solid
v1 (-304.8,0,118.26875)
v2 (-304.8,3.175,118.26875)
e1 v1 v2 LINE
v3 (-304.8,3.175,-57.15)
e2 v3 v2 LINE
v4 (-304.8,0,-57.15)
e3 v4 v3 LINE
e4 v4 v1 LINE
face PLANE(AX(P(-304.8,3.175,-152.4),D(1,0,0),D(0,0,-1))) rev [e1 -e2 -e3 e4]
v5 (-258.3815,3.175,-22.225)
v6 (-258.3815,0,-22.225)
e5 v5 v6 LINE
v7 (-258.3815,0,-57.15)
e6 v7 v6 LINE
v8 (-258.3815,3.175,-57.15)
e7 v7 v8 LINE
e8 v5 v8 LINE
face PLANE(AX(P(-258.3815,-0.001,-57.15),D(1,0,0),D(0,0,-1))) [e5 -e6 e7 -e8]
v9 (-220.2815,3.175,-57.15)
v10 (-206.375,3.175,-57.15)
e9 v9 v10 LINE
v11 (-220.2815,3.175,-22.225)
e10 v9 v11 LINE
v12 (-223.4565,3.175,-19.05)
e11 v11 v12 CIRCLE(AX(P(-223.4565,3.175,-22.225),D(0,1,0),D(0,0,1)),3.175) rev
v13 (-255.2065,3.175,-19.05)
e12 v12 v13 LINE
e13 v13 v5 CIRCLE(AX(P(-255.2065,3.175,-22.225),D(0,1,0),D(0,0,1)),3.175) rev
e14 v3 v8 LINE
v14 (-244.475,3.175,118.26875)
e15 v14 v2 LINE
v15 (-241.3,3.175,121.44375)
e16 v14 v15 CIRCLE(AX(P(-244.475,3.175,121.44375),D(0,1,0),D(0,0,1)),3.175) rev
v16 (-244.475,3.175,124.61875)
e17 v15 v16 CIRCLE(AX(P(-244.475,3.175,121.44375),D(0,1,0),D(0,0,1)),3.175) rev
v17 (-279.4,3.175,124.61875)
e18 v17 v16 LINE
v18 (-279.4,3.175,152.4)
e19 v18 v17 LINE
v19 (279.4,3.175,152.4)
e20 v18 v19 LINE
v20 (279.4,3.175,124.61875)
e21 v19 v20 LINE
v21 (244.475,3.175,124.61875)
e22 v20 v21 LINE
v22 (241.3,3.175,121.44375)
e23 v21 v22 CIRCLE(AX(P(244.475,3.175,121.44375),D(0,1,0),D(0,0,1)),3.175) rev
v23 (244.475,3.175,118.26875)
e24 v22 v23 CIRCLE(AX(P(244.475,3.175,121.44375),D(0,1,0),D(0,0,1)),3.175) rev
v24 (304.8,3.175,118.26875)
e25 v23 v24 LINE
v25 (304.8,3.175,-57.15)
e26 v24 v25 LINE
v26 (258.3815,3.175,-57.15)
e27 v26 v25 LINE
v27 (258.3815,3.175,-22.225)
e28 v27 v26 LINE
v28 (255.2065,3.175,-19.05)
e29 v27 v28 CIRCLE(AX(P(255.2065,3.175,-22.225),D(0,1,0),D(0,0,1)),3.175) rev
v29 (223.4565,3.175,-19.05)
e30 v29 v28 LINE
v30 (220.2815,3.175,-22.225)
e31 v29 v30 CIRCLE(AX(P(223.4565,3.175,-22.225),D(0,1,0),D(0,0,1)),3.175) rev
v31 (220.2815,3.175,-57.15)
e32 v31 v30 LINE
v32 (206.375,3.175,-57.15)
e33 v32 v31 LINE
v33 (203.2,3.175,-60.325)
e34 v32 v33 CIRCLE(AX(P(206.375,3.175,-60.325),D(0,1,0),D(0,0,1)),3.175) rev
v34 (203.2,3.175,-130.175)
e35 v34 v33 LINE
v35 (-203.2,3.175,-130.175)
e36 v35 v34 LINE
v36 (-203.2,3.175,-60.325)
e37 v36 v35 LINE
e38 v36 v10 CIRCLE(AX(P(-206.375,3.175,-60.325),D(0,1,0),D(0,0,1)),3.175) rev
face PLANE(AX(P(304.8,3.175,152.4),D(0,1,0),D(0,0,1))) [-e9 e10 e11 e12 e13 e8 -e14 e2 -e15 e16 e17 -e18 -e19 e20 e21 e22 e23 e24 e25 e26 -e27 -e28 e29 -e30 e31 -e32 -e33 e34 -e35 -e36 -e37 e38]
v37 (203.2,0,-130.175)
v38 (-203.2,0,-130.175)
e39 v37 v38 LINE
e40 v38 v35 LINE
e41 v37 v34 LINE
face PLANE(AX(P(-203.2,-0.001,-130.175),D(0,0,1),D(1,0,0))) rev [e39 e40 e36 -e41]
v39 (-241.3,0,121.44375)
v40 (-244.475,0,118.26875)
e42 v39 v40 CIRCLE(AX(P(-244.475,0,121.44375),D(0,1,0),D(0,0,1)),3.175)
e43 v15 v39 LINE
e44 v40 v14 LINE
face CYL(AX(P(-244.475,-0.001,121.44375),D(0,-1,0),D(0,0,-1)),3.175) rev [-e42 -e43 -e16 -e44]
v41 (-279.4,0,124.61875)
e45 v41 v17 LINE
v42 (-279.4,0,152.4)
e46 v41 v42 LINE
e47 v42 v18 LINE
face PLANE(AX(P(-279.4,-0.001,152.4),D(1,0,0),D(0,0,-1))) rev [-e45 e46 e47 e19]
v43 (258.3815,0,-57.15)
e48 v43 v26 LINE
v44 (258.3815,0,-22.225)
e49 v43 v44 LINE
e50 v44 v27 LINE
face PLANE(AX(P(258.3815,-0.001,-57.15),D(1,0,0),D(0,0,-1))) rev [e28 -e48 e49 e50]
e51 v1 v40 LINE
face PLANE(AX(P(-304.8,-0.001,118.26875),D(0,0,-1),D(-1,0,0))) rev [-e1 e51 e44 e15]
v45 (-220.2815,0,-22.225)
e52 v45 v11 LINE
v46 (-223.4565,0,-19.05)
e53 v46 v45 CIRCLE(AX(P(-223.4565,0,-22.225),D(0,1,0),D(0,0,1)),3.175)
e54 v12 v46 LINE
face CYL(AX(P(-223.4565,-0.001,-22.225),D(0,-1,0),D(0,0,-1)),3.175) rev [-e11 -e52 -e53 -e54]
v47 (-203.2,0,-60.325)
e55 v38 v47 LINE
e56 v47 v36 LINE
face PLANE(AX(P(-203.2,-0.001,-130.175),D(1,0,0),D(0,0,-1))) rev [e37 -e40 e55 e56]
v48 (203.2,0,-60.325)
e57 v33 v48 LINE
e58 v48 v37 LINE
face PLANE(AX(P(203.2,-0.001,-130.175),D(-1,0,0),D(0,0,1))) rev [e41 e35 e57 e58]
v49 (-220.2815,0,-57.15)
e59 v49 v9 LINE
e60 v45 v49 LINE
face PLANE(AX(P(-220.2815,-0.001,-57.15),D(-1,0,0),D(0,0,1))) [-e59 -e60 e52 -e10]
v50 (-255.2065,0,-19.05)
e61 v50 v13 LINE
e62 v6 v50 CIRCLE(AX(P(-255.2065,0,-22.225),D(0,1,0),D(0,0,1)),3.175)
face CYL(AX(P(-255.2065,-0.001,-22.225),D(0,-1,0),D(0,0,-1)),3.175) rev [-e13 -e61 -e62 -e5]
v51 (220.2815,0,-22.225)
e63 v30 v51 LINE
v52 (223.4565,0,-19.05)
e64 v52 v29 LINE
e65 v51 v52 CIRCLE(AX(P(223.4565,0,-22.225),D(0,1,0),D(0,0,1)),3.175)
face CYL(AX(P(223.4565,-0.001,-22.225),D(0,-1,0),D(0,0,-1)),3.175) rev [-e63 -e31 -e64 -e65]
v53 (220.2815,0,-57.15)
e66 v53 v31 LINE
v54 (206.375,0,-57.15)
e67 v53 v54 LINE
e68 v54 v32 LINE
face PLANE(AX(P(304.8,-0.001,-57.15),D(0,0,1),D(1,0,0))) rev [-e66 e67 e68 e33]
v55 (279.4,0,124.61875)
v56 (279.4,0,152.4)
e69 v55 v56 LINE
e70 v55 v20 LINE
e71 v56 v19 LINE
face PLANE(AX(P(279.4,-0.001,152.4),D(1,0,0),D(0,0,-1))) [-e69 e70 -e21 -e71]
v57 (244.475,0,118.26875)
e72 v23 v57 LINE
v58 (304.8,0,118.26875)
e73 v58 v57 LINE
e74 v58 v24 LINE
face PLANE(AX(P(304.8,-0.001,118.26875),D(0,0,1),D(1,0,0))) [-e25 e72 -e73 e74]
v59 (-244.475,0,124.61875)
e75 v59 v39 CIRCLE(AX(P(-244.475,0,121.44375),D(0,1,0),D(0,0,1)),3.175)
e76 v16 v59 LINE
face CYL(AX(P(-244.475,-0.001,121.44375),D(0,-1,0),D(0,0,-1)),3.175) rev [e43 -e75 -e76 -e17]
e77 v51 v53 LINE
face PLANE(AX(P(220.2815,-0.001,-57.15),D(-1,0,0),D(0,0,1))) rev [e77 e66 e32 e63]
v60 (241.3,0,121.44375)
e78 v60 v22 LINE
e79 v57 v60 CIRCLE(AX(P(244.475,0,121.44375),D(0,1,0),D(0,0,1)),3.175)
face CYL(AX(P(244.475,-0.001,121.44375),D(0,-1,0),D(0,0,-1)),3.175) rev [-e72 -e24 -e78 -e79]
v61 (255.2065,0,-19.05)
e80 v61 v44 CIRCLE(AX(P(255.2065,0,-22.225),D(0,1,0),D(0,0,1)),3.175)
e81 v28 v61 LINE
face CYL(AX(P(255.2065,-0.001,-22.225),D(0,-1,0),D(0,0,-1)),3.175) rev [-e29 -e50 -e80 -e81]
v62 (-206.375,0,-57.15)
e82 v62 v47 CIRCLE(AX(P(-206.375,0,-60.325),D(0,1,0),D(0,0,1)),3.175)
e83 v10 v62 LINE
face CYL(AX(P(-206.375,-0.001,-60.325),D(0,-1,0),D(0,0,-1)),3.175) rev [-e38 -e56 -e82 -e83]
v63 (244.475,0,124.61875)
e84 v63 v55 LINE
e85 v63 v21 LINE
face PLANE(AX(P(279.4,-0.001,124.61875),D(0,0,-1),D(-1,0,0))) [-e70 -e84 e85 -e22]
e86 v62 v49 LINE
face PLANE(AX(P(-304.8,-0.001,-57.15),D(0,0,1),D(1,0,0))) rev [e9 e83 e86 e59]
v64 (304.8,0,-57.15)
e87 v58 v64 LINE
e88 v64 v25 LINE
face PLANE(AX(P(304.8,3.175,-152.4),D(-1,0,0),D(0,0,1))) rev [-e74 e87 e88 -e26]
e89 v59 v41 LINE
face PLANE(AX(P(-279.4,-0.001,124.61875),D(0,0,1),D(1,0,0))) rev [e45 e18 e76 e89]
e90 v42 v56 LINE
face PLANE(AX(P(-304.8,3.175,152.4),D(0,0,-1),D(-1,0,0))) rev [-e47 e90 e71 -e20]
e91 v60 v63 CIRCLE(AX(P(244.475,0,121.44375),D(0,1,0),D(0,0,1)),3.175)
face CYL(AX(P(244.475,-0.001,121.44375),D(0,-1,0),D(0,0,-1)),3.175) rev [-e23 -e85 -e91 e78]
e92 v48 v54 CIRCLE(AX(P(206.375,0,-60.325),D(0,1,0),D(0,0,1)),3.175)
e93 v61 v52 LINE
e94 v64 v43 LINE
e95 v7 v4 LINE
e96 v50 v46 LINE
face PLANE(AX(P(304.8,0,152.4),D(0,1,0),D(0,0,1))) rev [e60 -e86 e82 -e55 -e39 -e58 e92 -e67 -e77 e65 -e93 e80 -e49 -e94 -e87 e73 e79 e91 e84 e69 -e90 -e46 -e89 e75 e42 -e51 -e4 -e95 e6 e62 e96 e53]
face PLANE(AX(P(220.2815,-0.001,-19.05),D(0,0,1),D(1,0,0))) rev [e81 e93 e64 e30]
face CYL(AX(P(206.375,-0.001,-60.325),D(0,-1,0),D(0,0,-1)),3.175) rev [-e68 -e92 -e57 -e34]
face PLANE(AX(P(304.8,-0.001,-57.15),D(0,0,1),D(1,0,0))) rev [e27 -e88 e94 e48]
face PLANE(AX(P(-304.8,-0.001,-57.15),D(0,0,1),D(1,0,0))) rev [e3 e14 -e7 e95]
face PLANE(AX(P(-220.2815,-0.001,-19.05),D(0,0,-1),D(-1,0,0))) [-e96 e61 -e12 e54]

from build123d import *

# Parameters (mm, degrees)
SKETCH1_W            = 609.6
SKETCH1_H            = 304.8
BOSS_EXTRUDE1_DEPTH  = 3.175
CUT_EXTRUDE1_REACH   = 342.792
FILLET1_R            = 3.175
CUT_EXTRUDE2_REACH   = 342.792
SKETCH4_W            = 38.1
SKETCH4_H            = 38.1
FILLET2_R            = 3.175
FILLET2_OF_MIRROR1_R = 3.175
CUT_EXTRUDE3_REACH   = 342.792
FILLET3_R            = 3.175
FILLET3_OF_MIRROR2_R = 3.175


with BuildPart() as part:
    # Sketch1 → Boss-Extrude1 (new body)
    with BuildSketch(Plane(origin=(0, 0, 0), x_dir=(1, 0, 0), z_dir=(0, 1, 0))):
        Rectangle(SKETCH1_W, SKETCH1_H)
    extrude(amount=BOSS_EXTRUDE1_DEPTH)

    # Sketch3 → Cut-Extrude1 (cut, up to next)
    with BuildSketch(Plane(origin=(0, 3.175, 0), x_dir=(1, 0, 0), z_dir=(0, 1, 0)), mode=Mode.PRIVATE) as cut_extrude1_sk1:
        Polygon((-304.8, 152.4), (304.8, 152.4), (304.8, 57.15), (203.2, 57.15), (203.2, 130.175), (-203.2, 130.175), (-203.2, 57.15), (-304.8, 57.15), align=None)
    cut_extrude1_tool1 = extrude(cut_extrude1_sk1.sketch, amount=-CUT_EXTRUDE1_REACH, mode=Mode.PRIVATE) & part.part
    add(cut_extrude1_tool1.solids().sort_by_distance((0, 3.175, -146.230035))[0], mode=Mode.SUBTRACT)

    # Fillet1
    fillet1_edges = [part.edges().sort_by_distance(p)[0] for p in [
        (203.2, 1.5875, -57.15),
        (-203.2, 1.5875, -57.15),
    ]]
    fillet(fillet1_edges, radius=FILLET1_R)

    # Sketch4 → Cut-Extrude2 (cut, up to next)
    with BuildSketch(Plane(origin=(0, 3.175, 0), x_dir=(1, 0, 0), z_dir=(0, 1, 0)), mode=Mode.PRIVATE) as cut_extrude2_sk1:
        with Locations((239.3315, 38.1)):
            Rectangle(SKETCH4_W, SKETCH4_H)
    cut_extrude2_tool1 = extrude(cut_extrude2_sk1.sketch, amount=-CUT_EXTRUDE2_REACH, mode=Mode.PRIVATE) & part.part
    cut_extrude2 = cut_extrude2_tool1.solids().sort_by_distance((239.3315, 3.175, -38.1))[0]
    add(cut_extrude2, mode=Mode.SUBTRACT)

    # Fillet2
    fillet2_edges = [part.edges().sort_by_distance(p)[0] for p in [
        (258.3815, 1.5875, -19.05),
        (220.2815, 1.5875, -19.05),
    ]]
    fillet(fillet2_edges, radius=FILLET2_R)

    # Mirror1: Cut-Extrude2 across plane
    add(cut_extrude2.mirror(Plane(origin=(0, 0, 0), x_dir=(0, 0, 1), z_dir=(1, 0, 0))), mode=Mode.SUBTRACT)

    # Fillet2 of Mirror1
    fillet2_of_mirror1_edges = [part.edges().sort_by_distance(p)[0] for p in [
        (-258.3815, 1.5875, -19.05),
        (-220.2815, 1.5875, -19.05),
    ]]
    fillet(fillet2_of_mirror1_edges, radius=FILLET2_OF_MIRROR1_R)

    # Sketch5 → Cut-Extrude3 (cut, up to next)
    with BuildSketch(Plane(origin=(0, 3.175, 0), x_dir=(1, 0, 0), z_dir=(0, 1, 0)), mode=Mode.PRIVATE) as cut_extrude3_sk1:
        Polygon((-279.4, -152.4), (-279.4, -124.61875), (-241.3, -124.61875), (-241.3, -118.26875), (-304.8, -118.26875), (-304.8, -152.4), align=None)
    cut_extrude3_tool1 = extrude(cut_extrude3_sk1.sketch, amount=-CUT_EXTRUDE3_REACH, mode=Mode.PRIVATE) & part.part
    cut_extrude3 = cut_extrude3_tool1.solids().sort_by_distance((-285.172727, 3.175, 132.303693))[0]
    add(cut_extrude3, mode=Mode.SUBTRACT)

    # Fillet3
    fillet3_edges = [part.edges().sort_by_distance(p)[0] for p in [
        (-241.3, 1.5875, 124.61875),
        (-241.3, 1.5875, 118.26875),
    ]]
    fillet(fillet3_edges, radius=FILLET3_R - 0.0001)  # a hair under: the kernel refuses the full size

    # Mirror2: Cut-Extrude3 across plane
    add(cut_extrude3.mirror(Plane(origin=(0, 0, 0), x_dir=(0, 0, 1), z_dir=(1, 0, 0))), mode=Mode.SUBTRACT)

    # Fillet3 of Mirror2
    fillet3_of_mirror2_edges = [part.edges().sort_by_distance(p)[0] for p in [
        (241.3, 1.5875, 124.61875),
        (241.3, 1.5875, 118.26875),
    ]]
    fillet(fillet3_of_mirror2_edges, radius=FILLET3_OF_MIRROR2_R - 0.0001)  # a hair under: the kernel refuses the full size


solid = part.part
